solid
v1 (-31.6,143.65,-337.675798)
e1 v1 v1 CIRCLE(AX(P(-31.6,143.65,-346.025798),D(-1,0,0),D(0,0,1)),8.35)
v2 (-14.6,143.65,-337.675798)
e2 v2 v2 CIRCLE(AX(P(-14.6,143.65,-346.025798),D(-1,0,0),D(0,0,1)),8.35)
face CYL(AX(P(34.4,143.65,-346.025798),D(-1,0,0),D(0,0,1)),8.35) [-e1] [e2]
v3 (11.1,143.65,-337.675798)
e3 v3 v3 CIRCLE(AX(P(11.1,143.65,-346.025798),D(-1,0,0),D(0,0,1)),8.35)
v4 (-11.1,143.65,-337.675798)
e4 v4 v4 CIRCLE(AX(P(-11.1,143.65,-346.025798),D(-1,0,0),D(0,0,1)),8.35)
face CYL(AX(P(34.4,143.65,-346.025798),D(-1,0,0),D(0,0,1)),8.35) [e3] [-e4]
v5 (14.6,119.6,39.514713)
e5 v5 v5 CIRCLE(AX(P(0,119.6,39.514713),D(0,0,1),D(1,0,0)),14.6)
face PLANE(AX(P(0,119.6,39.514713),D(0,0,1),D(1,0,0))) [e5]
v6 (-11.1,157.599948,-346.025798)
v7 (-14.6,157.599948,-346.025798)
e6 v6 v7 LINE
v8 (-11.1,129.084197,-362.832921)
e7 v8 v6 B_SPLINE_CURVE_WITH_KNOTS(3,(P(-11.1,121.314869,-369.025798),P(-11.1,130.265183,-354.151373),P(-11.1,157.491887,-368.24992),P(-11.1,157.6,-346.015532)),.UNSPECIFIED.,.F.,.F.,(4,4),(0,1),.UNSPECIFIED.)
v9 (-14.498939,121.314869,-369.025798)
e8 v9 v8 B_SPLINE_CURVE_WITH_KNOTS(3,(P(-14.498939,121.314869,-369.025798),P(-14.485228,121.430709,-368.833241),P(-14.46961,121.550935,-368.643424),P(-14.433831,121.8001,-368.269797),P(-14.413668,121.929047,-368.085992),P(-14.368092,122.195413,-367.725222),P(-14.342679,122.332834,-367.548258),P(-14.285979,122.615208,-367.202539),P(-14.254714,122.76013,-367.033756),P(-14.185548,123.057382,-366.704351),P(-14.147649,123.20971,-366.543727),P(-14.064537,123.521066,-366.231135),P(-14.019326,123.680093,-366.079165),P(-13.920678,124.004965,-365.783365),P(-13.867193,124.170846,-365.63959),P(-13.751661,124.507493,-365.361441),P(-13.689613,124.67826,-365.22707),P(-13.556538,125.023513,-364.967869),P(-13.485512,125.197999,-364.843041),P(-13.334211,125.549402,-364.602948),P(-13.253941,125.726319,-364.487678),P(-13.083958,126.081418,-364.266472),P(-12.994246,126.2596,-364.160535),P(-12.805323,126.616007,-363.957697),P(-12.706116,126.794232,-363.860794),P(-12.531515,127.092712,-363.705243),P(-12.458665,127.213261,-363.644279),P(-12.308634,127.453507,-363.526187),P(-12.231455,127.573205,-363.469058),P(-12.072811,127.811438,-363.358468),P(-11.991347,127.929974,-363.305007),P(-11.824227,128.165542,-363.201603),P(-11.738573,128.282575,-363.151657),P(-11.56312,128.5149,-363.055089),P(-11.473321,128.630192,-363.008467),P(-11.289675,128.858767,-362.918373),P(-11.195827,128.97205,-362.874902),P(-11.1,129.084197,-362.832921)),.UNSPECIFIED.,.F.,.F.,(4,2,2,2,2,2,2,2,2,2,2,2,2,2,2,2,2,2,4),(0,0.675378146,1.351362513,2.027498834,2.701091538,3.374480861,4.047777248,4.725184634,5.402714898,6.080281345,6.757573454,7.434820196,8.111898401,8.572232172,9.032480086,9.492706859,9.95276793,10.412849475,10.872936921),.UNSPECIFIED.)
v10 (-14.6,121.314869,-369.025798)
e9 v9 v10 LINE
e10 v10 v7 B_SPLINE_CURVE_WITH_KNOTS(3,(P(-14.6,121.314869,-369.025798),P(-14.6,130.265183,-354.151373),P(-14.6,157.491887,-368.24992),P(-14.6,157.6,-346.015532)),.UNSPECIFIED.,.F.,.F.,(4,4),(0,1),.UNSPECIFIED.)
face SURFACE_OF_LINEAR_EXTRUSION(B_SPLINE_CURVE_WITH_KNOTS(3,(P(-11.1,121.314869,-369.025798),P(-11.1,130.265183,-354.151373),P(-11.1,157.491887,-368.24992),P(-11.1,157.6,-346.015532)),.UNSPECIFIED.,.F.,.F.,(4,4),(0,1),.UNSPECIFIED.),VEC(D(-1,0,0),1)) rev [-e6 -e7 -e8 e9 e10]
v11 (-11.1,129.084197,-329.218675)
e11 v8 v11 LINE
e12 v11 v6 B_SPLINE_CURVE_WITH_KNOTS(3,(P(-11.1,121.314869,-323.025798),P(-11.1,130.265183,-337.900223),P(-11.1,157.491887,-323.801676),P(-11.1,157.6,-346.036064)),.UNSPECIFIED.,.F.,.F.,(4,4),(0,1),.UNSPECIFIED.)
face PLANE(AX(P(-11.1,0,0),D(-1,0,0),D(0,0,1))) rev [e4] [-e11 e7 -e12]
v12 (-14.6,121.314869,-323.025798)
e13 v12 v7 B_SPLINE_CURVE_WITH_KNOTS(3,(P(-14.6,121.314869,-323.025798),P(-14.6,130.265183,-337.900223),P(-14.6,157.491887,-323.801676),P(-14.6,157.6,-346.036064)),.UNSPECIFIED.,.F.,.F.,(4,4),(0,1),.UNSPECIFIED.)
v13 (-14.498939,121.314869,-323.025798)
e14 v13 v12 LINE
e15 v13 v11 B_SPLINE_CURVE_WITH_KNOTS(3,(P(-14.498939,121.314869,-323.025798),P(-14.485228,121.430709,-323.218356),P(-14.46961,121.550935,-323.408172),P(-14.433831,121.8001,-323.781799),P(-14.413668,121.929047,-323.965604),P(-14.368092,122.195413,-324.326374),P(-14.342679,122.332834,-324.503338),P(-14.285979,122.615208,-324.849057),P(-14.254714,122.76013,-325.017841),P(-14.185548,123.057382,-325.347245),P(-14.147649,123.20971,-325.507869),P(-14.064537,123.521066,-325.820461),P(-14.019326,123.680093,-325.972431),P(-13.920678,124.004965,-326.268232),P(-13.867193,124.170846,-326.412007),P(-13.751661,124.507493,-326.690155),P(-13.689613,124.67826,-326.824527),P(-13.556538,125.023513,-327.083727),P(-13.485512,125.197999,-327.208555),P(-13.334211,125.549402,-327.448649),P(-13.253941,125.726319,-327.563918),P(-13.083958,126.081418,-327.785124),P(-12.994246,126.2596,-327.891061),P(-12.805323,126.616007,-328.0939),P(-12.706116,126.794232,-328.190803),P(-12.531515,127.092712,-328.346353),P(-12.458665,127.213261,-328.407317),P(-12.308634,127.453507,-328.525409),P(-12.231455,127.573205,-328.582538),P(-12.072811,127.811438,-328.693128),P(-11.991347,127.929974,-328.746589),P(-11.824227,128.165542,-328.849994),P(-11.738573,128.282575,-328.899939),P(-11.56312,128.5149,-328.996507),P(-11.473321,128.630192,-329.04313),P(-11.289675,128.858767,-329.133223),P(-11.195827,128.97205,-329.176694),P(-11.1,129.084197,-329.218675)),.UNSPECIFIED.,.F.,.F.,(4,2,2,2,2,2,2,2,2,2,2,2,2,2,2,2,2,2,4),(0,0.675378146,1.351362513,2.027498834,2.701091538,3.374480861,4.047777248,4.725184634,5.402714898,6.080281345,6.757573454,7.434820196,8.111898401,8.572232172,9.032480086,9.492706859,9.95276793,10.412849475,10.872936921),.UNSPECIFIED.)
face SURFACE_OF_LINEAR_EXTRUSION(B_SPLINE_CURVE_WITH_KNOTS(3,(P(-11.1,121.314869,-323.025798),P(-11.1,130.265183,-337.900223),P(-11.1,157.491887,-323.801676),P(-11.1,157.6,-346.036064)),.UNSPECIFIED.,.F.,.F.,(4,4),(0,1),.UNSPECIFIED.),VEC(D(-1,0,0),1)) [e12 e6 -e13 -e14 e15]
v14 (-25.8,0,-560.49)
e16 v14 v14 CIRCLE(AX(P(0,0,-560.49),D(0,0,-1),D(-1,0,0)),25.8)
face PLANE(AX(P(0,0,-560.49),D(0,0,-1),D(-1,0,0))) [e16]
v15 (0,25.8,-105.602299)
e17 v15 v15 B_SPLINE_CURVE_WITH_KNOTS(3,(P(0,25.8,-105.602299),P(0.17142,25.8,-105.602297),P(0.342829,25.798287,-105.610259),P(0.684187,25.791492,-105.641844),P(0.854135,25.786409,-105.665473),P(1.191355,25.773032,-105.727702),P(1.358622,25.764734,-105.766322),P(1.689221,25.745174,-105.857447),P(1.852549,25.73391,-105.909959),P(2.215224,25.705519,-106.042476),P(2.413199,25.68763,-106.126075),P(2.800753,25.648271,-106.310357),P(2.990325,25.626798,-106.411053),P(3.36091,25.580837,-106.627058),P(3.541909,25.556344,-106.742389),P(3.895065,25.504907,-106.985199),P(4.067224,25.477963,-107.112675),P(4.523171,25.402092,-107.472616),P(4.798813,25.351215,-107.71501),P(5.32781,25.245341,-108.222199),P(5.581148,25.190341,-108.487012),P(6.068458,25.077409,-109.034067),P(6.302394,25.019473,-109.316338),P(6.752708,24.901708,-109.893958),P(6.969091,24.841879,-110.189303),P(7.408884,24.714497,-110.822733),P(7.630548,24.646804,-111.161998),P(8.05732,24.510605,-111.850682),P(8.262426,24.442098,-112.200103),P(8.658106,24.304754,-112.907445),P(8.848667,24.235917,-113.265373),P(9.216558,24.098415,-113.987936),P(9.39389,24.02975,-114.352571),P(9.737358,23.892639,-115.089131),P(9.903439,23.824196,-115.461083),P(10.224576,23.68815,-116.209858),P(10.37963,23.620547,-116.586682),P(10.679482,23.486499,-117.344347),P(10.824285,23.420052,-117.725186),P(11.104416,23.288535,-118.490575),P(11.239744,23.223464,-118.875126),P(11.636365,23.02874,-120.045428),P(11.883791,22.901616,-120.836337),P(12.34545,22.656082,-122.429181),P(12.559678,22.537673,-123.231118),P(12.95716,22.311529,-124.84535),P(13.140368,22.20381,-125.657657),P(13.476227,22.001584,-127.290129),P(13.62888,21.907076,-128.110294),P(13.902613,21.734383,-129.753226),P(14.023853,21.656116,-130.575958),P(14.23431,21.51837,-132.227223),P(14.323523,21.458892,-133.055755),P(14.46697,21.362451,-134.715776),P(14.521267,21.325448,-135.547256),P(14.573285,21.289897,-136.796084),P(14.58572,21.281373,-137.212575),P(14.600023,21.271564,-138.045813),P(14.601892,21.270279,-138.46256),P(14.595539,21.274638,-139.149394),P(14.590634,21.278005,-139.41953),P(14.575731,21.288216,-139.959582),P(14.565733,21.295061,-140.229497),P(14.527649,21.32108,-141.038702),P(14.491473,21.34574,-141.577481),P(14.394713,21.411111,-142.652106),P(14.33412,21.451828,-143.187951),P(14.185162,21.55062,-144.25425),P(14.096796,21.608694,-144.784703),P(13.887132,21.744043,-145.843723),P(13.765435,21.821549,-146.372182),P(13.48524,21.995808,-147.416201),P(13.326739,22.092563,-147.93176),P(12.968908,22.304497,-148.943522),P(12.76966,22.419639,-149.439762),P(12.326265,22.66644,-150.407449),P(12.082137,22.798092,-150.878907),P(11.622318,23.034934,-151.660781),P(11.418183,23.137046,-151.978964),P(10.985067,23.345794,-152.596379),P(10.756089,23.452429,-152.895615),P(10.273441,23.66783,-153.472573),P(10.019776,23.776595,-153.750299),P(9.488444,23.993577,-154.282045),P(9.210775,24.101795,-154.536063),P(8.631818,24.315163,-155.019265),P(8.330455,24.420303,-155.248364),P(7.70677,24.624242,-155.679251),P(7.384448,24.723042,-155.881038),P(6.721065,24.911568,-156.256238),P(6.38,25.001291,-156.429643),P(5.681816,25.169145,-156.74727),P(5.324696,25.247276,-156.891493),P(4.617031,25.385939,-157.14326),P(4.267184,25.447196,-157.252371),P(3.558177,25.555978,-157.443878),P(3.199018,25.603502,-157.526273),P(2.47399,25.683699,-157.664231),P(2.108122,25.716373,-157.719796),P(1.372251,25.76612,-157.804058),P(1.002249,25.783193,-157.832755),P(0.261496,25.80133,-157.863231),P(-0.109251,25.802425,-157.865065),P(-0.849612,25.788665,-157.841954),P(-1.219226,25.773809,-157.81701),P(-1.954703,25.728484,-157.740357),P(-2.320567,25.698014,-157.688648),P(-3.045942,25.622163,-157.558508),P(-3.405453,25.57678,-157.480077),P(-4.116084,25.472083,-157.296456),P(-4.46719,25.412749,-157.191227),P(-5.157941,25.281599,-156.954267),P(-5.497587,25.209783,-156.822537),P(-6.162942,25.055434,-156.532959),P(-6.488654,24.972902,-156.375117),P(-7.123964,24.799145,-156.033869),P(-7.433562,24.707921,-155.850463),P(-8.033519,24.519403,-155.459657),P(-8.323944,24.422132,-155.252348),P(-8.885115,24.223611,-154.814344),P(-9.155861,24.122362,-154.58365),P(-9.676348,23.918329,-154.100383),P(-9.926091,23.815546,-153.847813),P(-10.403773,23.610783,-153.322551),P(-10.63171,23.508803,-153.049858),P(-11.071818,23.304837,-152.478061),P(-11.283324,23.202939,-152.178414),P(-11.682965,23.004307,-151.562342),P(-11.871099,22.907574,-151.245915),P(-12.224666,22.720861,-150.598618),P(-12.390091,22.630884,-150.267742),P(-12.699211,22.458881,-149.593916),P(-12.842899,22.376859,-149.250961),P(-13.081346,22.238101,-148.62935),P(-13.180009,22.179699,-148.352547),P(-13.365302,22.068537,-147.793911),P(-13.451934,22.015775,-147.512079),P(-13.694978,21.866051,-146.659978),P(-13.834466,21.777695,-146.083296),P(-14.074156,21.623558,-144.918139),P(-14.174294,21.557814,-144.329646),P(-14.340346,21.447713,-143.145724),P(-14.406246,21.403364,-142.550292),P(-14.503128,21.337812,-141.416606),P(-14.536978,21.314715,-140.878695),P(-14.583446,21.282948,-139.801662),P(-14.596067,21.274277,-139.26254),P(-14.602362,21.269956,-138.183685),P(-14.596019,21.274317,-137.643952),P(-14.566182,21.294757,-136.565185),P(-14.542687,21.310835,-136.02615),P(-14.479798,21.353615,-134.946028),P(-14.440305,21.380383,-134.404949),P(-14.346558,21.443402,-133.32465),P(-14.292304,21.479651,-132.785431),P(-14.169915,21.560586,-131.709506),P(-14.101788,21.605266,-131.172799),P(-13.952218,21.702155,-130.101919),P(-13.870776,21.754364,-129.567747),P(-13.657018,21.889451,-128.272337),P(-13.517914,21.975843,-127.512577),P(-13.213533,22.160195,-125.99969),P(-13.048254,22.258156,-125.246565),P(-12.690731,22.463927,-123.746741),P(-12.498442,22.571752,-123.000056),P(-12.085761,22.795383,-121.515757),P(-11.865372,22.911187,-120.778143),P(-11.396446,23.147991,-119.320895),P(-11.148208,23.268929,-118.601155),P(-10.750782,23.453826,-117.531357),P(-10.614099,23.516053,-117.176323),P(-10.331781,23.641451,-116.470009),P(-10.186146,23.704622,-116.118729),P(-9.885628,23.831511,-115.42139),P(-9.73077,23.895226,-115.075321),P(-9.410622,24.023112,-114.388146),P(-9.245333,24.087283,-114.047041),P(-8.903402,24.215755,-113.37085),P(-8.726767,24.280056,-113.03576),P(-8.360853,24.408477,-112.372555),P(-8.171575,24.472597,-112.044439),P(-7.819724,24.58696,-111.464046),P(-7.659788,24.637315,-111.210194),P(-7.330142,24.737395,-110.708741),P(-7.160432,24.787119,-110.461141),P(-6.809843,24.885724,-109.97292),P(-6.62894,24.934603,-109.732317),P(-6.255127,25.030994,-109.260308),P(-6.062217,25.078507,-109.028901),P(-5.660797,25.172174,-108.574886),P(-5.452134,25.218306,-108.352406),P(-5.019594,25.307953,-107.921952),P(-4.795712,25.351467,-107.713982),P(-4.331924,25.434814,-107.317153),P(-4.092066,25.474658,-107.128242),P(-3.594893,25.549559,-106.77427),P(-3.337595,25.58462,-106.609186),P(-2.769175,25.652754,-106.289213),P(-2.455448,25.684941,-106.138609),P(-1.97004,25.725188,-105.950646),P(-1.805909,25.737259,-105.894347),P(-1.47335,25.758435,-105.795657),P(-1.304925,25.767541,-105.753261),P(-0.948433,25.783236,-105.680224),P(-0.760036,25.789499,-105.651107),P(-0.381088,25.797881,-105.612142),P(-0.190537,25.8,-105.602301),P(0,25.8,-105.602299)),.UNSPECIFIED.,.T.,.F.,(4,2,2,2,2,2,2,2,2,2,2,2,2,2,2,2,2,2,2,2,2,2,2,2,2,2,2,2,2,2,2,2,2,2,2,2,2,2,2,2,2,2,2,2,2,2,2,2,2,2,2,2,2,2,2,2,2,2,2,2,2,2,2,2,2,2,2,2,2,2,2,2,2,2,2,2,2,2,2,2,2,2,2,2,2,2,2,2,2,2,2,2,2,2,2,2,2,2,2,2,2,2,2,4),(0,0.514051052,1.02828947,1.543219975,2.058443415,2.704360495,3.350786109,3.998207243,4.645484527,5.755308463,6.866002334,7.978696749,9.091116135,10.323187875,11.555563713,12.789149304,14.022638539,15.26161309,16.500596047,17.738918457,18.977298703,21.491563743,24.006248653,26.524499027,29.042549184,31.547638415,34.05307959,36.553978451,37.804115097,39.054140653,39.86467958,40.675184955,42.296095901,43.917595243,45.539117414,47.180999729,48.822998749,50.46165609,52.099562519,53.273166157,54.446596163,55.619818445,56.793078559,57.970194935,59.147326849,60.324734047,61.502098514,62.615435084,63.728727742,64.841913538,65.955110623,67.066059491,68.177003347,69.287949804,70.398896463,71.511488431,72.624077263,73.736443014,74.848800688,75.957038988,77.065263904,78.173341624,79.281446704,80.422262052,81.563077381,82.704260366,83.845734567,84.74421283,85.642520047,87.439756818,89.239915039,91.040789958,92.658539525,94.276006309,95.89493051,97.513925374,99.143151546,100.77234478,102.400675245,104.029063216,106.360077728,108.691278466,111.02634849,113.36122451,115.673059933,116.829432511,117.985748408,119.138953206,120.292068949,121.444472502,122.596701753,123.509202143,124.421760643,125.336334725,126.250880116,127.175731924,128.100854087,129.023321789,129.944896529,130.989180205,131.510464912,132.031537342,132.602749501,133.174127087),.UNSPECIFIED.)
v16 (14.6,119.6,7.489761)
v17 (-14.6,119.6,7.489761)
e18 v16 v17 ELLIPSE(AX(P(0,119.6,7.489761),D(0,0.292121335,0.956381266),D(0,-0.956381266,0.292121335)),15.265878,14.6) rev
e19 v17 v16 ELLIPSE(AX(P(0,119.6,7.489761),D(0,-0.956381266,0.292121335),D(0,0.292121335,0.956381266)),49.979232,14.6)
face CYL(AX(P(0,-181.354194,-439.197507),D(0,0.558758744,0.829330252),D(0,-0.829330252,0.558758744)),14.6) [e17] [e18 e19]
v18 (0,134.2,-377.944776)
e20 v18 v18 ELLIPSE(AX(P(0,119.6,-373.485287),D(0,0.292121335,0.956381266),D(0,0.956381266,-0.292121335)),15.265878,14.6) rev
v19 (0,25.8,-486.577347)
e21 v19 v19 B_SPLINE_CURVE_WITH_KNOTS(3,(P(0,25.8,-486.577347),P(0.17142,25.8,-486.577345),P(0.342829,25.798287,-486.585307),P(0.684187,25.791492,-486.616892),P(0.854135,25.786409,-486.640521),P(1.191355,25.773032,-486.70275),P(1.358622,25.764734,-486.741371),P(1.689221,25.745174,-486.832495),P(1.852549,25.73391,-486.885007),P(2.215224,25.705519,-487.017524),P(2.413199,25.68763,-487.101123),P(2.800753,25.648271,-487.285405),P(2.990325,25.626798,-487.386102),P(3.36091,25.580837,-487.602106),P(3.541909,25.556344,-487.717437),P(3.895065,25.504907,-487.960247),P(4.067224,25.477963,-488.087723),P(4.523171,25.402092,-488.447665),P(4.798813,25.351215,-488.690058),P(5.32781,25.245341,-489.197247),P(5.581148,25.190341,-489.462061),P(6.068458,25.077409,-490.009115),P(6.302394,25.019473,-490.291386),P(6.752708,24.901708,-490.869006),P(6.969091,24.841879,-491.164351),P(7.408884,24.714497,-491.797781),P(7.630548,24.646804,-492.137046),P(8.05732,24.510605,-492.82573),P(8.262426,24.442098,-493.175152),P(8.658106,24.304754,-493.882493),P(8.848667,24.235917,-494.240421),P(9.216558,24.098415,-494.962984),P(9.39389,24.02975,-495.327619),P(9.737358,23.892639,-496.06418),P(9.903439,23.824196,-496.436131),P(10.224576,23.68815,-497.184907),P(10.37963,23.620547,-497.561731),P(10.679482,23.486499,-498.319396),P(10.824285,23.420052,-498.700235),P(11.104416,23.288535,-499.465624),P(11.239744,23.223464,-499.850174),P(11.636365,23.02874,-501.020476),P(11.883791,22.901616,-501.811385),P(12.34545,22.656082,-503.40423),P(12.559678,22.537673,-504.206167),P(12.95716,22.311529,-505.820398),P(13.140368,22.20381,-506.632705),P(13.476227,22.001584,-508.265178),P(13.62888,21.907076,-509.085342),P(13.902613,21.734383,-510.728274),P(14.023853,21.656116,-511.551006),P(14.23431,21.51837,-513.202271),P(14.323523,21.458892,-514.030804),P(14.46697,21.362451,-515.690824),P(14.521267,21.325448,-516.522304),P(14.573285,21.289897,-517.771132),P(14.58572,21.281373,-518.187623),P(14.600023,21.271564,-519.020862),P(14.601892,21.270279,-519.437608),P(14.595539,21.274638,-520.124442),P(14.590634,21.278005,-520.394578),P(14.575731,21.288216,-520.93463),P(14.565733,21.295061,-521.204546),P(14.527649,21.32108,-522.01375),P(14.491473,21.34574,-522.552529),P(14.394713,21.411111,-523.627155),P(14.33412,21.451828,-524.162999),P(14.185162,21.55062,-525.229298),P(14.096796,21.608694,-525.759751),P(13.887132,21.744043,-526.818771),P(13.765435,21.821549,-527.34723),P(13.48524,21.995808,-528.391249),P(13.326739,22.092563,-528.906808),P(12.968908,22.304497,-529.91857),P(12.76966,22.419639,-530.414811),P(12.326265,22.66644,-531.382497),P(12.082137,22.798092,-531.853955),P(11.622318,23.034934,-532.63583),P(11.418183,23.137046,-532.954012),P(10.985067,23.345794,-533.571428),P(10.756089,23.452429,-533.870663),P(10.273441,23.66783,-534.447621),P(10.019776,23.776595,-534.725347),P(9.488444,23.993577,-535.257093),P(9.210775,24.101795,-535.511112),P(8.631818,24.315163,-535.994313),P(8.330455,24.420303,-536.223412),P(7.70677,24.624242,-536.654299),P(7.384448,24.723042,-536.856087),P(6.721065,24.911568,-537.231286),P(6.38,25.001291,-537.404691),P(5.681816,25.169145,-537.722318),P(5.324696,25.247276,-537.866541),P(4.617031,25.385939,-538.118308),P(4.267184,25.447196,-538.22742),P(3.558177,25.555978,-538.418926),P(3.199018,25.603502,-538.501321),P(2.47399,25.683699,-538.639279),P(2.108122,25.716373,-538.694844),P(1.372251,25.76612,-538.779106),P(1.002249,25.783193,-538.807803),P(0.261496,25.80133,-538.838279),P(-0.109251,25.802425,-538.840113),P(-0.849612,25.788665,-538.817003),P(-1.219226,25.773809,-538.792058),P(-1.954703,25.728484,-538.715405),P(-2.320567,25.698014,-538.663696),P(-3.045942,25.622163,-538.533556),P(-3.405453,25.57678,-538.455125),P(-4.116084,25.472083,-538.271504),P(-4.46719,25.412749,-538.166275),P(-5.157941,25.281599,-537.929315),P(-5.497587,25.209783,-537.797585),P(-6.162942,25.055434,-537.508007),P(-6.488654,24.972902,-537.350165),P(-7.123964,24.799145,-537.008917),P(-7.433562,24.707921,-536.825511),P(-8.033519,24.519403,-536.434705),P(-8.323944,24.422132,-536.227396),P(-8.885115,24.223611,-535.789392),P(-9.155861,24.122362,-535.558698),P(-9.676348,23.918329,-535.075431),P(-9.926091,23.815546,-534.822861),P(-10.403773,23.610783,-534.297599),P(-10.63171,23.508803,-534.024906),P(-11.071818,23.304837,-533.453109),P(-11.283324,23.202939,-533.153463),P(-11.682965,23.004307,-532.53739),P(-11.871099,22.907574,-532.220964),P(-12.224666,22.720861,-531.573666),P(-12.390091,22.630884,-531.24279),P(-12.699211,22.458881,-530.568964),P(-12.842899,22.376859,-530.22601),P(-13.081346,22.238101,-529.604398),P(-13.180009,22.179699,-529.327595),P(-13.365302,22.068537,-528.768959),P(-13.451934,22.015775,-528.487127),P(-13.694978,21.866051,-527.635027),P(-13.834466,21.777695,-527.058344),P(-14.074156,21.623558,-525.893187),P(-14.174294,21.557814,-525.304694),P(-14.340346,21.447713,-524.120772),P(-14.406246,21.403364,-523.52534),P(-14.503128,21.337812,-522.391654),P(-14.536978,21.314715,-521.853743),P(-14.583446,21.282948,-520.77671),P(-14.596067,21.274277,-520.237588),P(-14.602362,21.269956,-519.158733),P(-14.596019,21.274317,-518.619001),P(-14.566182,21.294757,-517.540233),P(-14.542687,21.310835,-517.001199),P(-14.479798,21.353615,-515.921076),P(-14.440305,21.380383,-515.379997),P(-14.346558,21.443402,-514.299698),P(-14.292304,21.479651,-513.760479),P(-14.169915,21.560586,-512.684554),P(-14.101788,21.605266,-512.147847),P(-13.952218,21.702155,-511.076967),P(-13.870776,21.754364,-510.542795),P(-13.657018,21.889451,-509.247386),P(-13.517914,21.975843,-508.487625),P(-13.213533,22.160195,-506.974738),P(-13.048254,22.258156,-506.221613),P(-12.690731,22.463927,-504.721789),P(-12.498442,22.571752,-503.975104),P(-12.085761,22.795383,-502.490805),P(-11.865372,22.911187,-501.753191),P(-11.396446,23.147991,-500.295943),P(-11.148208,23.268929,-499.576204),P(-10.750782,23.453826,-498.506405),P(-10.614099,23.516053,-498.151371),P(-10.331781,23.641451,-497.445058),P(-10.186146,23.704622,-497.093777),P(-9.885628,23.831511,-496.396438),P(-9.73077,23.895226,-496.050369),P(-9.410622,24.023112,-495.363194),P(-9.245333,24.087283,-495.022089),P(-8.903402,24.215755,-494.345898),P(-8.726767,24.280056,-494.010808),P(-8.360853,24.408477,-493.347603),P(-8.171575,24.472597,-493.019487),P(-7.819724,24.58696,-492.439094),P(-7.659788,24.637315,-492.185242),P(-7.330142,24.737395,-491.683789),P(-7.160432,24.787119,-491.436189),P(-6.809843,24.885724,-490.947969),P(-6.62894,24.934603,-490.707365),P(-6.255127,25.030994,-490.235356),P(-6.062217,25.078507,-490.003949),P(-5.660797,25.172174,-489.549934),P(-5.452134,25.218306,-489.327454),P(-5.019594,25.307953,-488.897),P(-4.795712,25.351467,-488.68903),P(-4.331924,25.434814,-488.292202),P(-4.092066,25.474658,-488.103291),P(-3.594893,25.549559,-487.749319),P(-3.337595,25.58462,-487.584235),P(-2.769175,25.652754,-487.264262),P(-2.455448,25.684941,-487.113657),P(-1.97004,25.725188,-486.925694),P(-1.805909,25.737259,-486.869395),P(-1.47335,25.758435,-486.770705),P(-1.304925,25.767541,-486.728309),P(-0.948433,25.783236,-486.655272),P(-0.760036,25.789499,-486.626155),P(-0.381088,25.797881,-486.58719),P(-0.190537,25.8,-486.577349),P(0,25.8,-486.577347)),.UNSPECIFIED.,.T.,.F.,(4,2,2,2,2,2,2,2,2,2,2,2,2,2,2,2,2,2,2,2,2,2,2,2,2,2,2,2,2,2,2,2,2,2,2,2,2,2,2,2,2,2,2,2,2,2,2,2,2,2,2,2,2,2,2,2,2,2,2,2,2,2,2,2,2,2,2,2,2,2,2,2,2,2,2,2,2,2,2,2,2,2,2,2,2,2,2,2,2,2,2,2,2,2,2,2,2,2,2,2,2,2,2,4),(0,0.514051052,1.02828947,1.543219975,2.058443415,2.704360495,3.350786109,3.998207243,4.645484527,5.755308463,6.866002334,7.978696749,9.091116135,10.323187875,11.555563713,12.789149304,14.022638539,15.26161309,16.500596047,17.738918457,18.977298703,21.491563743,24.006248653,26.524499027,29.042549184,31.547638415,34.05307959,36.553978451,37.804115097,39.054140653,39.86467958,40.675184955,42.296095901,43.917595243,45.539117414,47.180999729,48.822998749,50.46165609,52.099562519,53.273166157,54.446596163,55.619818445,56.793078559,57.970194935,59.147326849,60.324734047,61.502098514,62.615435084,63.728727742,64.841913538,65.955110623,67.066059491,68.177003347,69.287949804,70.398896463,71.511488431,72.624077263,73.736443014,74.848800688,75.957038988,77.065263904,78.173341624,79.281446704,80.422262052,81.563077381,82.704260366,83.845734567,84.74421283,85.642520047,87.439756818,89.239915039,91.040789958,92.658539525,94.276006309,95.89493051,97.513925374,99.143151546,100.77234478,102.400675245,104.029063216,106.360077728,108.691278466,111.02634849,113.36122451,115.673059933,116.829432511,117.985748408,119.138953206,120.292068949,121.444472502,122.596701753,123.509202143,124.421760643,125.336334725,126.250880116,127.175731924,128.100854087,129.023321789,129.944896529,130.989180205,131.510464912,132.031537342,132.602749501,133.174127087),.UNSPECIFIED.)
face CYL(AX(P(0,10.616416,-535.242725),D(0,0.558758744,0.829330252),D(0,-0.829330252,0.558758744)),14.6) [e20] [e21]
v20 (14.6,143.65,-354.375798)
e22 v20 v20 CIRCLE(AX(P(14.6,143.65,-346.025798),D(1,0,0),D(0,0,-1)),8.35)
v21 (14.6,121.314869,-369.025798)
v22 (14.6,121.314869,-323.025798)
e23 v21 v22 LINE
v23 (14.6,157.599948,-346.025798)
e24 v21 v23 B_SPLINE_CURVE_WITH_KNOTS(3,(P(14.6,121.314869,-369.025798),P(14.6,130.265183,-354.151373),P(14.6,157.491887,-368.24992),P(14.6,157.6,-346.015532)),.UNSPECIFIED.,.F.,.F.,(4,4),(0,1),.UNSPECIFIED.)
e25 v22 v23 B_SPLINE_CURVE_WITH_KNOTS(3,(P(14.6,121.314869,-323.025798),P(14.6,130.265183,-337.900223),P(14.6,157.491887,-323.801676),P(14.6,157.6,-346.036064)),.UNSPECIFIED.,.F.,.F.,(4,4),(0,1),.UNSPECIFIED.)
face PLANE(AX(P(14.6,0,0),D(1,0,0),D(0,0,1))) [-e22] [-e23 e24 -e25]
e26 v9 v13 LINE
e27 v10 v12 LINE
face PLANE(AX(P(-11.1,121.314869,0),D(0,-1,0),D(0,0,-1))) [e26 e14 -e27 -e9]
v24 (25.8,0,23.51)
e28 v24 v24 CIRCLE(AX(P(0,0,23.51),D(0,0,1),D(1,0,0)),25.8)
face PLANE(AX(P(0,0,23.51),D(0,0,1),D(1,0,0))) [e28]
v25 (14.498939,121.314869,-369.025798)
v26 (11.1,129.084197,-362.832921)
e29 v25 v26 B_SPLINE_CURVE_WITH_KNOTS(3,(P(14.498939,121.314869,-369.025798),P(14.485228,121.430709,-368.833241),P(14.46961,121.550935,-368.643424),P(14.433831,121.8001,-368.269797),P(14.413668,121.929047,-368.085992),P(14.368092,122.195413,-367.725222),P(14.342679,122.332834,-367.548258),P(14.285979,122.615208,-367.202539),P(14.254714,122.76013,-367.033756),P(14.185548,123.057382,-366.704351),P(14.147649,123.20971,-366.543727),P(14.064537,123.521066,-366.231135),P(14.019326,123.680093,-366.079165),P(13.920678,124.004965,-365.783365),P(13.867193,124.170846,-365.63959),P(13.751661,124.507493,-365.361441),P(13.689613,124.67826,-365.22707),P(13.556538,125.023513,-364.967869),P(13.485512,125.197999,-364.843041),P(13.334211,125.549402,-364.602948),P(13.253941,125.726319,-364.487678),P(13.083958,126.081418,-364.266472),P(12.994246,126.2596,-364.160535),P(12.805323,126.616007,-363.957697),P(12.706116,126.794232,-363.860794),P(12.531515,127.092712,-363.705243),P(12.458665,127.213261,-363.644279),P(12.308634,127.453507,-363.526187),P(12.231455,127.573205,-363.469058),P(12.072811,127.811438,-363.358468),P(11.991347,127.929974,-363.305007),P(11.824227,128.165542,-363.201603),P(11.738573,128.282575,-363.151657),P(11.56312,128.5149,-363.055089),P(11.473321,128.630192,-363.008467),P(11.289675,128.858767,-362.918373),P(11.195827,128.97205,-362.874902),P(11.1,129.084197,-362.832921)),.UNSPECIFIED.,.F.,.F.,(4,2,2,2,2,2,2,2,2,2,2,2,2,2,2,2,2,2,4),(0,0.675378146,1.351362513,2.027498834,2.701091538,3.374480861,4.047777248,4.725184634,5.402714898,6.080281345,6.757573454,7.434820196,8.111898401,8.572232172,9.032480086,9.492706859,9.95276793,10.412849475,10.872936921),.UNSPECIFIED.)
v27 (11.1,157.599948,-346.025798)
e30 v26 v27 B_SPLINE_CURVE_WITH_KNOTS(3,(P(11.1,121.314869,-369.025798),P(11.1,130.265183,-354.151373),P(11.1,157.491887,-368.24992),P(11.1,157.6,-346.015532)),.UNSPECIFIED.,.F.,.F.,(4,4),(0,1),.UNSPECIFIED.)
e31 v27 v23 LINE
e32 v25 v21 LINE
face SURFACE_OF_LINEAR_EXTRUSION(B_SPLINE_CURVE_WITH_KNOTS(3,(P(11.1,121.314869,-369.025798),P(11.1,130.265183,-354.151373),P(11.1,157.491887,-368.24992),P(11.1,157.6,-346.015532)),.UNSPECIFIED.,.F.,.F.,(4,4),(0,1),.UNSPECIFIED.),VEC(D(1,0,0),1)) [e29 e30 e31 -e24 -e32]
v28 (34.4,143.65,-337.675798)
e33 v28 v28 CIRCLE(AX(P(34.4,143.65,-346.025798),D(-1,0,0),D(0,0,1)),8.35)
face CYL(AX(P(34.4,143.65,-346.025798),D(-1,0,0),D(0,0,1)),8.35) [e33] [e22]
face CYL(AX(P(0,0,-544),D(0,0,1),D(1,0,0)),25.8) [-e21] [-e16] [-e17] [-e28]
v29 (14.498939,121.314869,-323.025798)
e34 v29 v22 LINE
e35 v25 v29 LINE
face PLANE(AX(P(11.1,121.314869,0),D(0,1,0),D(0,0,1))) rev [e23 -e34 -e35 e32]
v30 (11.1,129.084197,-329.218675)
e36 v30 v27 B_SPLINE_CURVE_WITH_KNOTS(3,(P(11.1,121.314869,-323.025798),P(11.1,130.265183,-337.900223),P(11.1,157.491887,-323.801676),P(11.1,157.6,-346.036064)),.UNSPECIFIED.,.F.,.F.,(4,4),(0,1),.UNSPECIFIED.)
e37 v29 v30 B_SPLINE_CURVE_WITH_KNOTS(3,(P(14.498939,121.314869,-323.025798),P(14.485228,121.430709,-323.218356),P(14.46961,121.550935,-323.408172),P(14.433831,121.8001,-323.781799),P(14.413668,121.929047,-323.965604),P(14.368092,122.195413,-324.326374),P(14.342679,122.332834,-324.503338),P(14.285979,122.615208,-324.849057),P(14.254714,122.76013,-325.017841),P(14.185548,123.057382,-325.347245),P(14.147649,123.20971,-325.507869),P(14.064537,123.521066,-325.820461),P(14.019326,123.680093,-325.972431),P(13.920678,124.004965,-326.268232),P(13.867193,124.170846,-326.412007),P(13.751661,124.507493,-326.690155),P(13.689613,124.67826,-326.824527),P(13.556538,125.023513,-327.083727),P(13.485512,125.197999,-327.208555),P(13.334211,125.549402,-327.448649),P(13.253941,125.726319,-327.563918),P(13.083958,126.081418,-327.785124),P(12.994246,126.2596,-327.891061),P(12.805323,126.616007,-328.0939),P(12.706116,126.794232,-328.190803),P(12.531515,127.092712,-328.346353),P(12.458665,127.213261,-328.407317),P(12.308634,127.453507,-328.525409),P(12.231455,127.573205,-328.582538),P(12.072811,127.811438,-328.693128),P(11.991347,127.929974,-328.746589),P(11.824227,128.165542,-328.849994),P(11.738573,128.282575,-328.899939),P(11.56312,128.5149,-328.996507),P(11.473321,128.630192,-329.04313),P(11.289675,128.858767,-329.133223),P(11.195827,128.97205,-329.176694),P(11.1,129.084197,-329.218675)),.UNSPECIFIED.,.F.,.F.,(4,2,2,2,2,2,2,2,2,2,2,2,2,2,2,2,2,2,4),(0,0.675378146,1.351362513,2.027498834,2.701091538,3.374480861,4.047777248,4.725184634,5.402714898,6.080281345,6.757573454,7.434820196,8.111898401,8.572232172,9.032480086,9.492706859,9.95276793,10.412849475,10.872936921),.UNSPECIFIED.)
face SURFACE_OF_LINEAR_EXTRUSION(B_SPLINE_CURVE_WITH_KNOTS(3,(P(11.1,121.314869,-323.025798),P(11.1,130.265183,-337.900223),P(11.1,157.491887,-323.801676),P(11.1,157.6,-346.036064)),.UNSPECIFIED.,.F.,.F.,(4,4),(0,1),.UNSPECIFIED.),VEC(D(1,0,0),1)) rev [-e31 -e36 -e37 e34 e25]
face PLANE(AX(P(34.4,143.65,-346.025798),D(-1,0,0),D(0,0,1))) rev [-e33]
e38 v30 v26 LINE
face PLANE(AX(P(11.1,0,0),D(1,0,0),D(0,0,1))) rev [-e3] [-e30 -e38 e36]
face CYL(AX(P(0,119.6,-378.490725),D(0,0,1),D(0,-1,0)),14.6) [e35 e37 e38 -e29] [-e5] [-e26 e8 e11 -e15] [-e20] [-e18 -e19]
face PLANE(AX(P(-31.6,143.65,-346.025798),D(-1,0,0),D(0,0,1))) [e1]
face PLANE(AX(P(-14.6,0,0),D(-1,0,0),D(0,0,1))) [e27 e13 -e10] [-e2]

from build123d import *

# Parameters (mm, degrees)
SKETCH1_R                = 25.8
BOSS_EXTRUDE1_DEPTH      = 544
SKETCH6_R                = 14.6
BOSS_EXTRUDE2_REACH      = 541.822
BOSS_EXTRUDE2_END_RADIUS = 25.8
SKETCH4_R                = 14.6
BOSS_EXTRUDE3_START      = -3.5
BOSS_EXTRUDE3_OUTLINE_R  = 8.35
BOSS_EXTRUDE3_DEPTH      = 3.5
BOSS_EXTRUDE4_START      = 17
SKETCH7_3_R              = 8.35
BOSS_EXTRUDE4_DEPTH      = 66
SKETCH9_R                = 25.8
BOSS_EXTRUDE5_DEPTH      = 16.49
BOSS_EXTRUDE6_START      = 23.51
SKETCH10_R               = 25.8
BOSS_EXTRUDE6_DEPTH      = 23.51
BOSS_EXTRUDE7_START      = 13
SKETCH11_R               = 14.6
BOSS_EXTRUDE7_DEPTH      = 13


# Read off the part's stored shape, not the designer's step: Boss-Extrude3
with BuildPart() as part:
    # Sketch1 → Boss-Extrude1 (new body)
    with BuildSketch(Plane.XY):
        Circle(SKETCH1_R)
    extrude(amount=-BOSS_EXTRUDE1_DEPTH)

    # Sweep2: sweep along a path in Sketch2
    with BuildLine(Plane(origin=(0, 0, 0), x_dir=(0, 0, -1), z_dir=(1, 0, 0))) as sweep2_path:
        Line((535.242725219, 10.616416132), (373.485286901, 119.6))
        Line((373.485286901, 119.6), (-26.514713099, 119.6))
    # Sketch6 → Sweep2 (sweep)
    with BuildSketch(Plane(origin=(0, 10.616416132, -535.242725219), x_dir=(1, 0, 0), z_dir=(0, 0.5587587437797145, 0.8293302516185669))):
        Circle(SKETCH6_R)
    sweep(path=sweep2_path.line, transition=Transition.RIGHT)

    # Boss-Extrude2: up to this cylinder (the profile starts outside it)
    boss_extrude2_end = Plane(origin=(0, 0, 7.489761), z_dir=(0, 0, 1)) * Cylinder(BOSS_EXTRUDE2_END_RADIUS, 1136.244, mode=Mode.PRIVATE)
    # Sketch4 → Boss-Extrude2 (add, up to the surface)
    with BuildSketch(Plane(origin=(0, 296.142134203, -111.454966642), x_dir=(1, 0, 0), z_dir=(0, 0.5587587437797145, 0.8293302516185669)), mode=Mode.PRIVATE) as boss_extrude2_sk1:
        with Locations(Location((0, -212.87313933, 0), (0, 0, 270))):
            Circle(SKETCH4_R)
    boss_extrude2_tool1 = extrude(boss_extrude2_sk1.sketch, amount=-BOSS_EXTRUDE2_REACH, mode=Mode.PRIVATE) - boss_extrude2_end
    add(boss_extrude2_tool1.solids().sort_by_distance((0, 119.6, 7.489761))[0])

    # Boss-Extrude3 outline → Boss-Extrude3 (add)
    with BuildSketch(Plane.ZY.offset(14.6).offset(BOSS_EXTRUDE3_START)):
        with BuildLine():
            add(Edge.make_bspline(
                [(-369.025798161, 121.314868638), (-354.153662916, 130.263805611), (-368.24558028, 157.483504956), (-346.0257981, 157.599948143)],
                knots=[0, 0, 0, 0, 0.999846057, 0.999846057, 0.999846057, 0.999846057], degree=3))
            Line((-369.025798161, 121.314868638), (-323.025798161, 121.314868638))
            add(Edge.make_bspline(
                [(-323.025798161, 121.314868638), (-337.897933379, 130.263805595), (-323.806016093, 157.483504857), (-346.0257981, 157.599948143)],
                knots=[0, 0, 0, 0, 0.999846056, 0.999846056, 0.999846056, 0.999846056], degree=3))
        make_face()
        with Locations((-346.025798161, 143.65)):
            Circle(BOSS_EXTRUDE3_OUTLINE_R, mode=Mode.SUBTRACT)
    boss_extrude3 = extrude(amount=BOSS_EXTRUDE3_DEPTH)

    # Mirror1: Boss-Extrude3 across plane
    add(boss_extrude3.mirror(Plane.ZY))

    # Sketch7<3> → Boss-Extrude4 (add)
    with BuildSketch(Plane.ZY.offset(14.6).offset(BOSS_EXTRUDE4_START)):
        with Locations((-346.025798161, 143.65)):
            Circle(SKETCH7_3_R)
    extrude(amount=-BOSS_EXTRUDE4_DEPTH)

    # Sketch9 → Boss-Extrude5 (add)
    with BuildSketch(Plane(origin=(0, 0, -544), x_dir=(-1, 0, 0), z_dir=(0, 0, -1))):
        with Locations(Location((0, 0, 0), (0, 0, 180))):
            Circle(SKETCH9_R)
    extrude(amount=BOSS_EXTRUDE5_DEPTH)

    # Sketch10 → Boss-Extrude6 (add)
    with BuildSketch(Plane.XY.offset(BOSS_EXTRUDE6_START)):
        Circle(SKETCH10_R)
    extrude(amount=-BOSS_EXTRUDE6_DEPTH)

    # Sketch11 → Boss-Extrude7 (add)
    with BuildSketch(Plane.XY.offset(26.514713099).offset(BOSS_EXTRUDE7_START)):
        with Locations((0, 119.6)):
            Circle(SKETCH11_R)
    extrude(amount=-BOSS_EXTRUDE7_DEPTH)


solid = part.part
